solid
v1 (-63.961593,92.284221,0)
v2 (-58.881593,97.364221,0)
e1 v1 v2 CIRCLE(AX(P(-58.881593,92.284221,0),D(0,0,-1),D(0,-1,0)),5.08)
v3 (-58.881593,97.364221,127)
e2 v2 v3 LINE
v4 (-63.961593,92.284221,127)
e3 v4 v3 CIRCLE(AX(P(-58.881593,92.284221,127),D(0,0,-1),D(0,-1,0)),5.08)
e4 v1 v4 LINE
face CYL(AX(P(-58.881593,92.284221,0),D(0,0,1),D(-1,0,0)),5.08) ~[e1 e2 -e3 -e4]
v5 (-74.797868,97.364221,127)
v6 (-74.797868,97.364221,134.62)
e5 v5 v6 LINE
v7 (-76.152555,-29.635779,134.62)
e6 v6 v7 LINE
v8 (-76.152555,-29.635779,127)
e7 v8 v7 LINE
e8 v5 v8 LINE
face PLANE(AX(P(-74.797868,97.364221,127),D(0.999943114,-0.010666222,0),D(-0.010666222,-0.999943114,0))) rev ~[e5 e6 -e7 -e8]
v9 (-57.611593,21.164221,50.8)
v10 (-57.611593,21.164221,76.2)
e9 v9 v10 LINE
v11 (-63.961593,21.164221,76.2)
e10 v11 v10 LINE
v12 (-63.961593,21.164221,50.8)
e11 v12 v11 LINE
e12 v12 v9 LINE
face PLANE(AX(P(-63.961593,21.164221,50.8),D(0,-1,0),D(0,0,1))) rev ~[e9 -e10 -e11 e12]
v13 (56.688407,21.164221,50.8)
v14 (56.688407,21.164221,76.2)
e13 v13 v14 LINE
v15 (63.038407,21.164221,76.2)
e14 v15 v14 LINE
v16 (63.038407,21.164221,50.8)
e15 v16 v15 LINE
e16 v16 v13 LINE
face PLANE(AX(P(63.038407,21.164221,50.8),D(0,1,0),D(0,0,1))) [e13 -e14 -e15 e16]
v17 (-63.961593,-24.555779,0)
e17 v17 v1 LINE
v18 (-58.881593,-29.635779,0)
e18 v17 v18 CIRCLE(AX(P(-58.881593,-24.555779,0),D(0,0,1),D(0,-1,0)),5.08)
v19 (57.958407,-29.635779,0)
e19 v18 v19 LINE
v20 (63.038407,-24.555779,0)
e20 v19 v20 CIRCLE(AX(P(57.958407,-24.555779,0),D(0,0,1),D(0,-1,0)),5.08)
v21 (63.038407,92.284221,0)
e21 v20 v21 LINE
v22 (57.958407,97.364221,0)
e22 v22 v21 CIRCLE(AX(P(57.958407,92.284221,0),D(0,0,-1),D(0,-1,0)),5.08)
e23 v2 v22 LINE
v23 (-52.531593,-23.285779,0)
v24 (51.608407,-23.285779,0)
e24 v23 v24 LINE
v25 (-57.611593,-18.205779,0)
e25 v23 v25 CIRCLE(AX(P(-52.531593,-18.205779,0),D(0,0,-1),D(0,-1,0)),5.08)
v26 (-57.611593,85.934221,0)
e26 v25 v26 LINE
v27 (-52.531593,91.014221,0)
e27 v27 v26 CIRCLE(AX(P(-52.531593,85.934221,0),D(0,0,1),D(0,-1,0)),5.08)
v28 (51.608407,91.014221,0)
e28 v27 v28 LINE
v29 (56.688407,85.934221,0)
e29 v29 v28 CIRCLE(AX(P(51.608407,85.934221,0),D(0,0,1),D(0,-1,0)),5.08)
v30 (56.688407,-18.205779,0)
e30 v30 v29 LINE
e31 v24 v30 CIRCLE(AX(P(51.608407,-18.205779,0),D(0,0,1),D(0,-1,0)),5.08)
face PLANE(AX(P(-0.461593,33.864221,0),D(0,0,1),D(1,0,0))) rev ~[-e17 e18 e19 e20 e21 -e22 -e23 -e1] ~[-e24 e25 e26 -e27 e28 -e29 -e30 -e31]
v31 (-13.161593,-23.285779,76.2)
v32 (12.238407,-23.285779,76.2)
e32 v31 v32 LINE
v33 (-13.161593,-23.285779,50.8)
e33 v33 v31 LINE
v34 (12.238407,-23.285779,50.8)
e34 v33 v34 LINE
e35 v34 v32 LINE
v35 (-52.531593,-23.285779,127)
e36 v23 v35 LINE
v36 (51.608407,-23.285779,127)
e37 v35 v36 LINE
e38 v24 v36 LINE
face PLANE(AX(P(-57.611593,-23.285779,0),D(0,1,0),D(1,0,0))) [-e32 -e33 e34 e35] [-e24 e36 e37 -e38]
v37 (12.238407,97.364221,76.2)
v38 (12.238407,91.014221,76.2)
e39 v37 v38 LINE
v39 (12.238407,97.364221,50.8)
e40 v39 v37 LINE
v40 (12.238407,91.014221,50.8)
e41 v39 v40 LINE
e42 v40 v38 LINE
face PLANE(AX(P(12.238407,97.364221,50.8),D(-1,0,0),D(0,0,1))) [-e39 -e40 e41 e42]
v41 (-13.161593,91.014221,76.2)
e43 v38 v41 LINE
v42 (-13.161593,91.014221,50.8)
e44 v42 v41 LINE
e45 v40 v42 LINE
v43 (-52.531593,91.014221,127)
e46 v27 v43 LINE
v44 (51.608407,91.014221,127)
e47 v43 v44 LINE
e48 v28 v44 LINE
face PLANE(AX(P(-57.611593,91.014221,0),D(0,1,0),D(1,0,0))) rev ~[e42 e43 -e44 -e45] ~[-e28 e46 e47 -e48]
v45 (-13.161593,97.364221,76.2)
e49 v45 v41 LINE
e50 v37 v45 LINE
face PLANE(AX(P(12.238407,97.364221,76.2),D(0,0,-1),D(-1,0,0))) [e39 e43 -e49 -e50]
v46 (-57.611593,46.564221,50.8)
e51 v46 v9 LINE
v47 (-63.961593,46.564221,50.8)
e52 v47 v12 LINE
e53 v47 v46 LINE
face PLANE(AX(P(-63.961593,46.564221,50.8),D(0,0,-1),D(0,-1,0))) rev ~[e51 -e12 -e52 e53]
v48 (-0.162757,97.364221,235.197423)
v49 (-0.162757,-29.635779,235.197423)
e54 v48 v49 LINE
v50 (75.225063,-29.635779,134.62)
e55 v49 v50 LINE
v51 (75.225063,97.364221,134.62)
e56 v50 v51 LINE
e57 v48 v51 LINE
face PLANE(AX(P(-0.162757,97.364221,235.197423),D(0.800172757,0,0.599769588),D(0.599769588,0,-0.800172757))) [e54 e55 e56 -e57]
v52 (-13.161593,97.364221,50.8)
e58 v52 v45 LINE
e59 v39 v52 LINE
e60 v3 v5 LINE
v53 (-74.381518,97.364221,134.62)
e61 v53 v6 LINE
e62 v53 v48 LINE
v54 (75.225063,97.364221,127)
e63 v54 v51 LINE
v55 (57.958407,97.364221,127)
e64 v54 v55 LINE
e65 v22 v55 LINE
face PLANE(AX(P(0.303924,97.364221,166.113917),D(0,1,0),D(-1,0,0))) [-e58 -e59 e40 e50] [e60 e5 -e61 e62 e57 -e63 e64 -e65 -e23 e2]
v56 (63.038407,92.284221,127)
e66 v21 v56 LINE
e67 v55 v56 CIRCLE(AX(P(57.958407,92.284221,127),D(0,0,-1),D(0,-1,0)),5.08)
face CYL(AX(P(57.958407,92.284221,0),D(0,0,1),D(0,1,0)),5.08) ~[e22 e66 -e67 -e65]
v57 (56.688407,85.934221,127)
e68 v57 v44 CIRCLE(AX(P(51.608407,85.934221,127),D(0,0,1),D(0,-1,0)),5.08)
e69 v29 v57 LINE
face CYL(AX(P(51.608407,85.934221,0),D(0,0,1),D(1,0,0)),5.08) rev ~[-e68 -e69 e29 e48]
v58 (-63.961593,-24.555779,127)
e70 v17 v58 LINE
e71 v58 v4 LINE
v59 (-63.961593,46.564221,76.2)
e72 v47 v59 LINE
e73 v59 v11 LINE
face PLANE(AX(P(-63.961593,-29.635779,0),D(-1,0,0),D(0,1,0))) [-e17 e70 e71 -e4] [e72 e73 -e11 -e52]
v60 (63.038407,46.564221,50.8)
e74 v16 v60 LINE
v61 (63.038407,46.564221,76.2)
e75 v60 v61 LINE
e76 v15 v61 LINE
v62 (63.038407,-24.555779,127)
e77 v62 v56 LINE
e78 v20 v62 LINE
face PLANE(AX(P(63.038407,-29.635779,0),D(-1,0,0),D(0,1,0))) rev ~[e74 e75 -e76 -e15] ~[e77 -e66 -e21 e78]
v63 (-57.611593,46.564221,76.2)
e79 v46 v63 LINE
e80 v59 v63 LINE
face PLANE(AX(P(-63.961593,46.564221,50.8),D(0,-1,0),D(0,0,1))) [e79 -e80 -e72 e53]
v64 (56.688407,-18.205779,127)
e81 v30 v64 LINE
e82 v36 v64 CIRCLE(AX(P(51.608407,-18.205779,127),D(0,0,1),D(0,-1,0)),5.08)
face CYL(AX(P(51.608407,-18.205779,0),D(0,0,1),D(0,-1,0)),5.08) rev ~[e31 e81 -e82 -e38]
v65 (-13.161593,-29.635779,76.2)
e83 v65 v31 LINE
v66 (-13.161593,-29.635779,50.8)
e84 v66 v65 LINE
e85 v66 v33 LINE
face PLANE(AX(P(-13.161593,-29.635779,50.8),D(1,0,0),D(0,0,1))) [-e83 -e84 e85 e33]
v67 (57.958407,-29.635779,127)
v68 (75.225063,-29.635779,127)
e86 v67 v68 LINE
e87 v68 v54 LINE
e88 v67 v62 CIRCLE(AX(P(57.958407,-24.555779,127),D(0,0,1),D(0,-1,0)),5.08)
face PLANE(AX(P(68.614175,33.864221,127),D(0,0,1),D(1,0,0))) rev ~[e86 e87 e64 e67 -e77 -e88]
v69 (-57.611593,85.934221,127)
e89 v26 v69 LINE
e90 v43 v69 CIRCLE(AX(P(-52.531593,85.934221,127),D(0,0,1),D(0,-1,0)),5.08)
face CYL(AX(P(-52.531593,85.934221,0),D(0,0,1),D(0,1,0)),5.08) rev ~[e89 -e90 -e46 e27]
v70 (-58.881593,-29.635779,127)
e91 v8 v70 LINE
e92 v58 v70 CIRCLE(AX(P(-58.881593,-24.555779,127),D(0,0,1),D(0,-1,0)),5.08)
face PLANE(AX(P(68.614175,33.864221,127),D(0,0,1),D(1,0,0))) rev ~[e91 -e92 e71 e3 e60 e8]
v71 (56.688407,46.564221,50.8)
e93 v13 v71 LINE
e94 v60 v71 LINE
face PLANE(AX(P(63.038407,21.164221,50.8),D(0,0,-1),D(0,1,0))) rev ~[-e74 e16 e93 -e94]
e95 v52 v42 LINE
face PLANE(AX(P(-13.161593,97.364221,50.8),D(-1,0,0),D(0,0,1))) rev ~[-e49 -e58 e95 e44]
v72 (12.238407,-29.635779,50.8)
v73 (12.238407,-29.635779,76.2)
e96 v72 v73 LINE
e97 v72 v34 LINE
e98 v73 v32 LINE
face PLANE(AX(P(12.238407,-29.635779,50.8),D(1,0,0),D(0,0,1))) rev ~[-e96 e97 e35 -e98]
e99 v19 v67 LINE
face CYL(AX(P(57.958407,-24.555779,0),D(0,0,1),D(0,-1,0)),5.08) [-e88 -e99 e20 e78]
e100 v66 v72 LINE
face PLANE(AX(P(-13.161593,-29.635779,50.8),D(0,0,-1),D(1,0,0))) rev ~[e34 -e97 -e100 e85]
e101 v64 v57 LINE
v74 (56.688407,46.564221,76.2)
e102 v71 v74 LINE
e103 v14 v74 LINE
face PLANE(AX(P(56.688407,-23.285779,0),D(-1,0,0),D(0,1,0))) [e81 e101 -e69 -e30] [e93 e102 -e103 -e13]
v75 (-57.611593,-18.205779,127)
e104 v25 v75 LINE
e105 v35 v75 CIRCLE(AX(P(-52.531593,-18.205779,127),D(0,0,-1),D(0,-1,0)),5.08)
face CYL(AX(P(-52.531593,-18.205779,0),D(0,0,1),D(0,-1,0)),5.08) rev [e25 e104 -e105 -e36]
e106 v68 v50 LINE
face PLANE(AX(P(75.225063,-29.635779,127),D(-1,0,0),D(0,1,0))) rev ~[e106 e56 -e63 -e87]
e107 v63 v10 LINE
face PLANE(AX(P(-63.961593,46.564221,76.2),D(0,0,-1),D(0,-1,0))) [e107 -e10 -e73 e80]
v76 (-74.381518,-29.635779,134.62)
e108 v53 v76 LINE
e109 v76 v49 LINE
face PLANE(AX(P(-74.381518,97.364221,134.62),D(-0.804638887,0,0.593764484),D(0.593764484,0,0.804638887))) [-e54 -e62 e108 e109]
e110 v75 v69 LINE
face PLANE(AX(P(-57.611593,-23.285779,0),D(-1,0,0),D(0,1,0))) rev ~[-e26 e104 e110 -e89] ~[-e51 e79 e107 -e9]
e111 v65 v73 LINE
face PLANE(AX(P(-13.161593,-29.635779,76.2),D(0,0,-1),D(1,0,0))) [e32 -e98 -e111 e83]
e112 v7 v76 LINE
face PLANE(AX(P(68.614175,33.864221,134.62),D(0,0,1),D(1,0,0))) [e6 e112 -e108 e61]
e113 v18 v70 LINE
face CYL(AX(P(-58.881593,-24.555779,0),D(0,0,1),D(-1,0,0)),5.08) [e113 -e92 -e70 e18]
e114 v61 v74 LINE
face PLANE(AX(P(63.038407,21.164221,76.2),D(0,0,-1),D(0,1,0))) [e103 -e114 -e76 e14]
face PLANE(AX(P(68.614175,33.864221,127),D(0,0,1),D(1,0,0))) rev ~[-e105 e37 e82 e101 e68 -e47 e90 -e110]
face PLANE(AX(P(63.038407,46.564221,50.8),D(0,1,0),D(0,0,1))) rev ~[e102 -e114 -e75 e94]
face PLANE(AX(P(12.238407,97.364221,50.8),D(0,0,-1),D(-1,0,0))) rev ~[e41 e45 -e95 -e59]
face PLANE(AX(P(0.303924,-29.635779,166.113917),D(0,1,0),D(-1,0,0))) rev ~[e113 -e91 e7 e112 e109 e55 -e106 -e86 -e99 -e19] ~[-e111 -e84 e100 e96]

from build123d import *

# Parameters (mm, degrees)
F0_W      = 127
F0_H      = 127
F0_W_2    = 114.3
F0_H_2    = 114.3
F1_DEPTH  = 127
F2_W      = 25.4
F2_H      = 25.4
F3_DEPTH  = 6.35
F6_COUNT  = 4
F7_R      = 5.08
F9_DEPTH  = 7.62
F11_DEPTH = 127


with BuildPart() as f1:
    # F0 (on Top) → F1 (new body)
    with BuildSketch(Plane.XY):
        with Locations((-0.4615932703, 33.8642211668)):
            Rectangle(F0_W, F0_H)
        with Locations((-0.4615932703, 33.8642211668)):
            Rectangle(F0_W_2, F0_H_2, mode=Mode.SUBTRACT)
    extrude(amount=F1_DEPTH)

    # F2 (on face) → F3 (cut, through all)
    with BuildSketch(Plane.YZ.offset(63.0384067297)):
        with Locations((33.8642211668, 63.5)):
            Rectangle(F2_W, F2_H)
    f3 = extrude(amount=-F3_DEPTH, mode=Mode.SUBTRACT)

    # F6: F3 ×4 about axis
    f6_axis = Axis((-0.4615932703, 33.8642211668, 78.3742320016), (0, 0, -1))
    for i in range(1, F6_COUNT):
        add(f3.rotate(f6_axis, i * 360 / F6_COUNT), mode=Mode.SUBTRACT)

    # F7
    f7_edges = [f1.edges().sort_by_distance(p)[0] for p in [
        (-63.961593, -29.635779, 63.5),
        (63.038407, -29.635779, 63.5),
        (-63.961593, 97.364221, 63.5),
        (56.688407, 91.014221, 63.5),
        (63.038407, 97.364221, 63.5),
        (-57.611593, 91.014221, 63.5),
        (-57.611593, -23.285779, 63.5),
        (56.688407, -23.285779, 63.5),
    ]]
    fillet(f7_edges, radius=F7_R)

    # F8 (on face) → F9 (join)
    with BuildSketch(Plane.XY.offset(127)):
        with BuildLine():
            ThreePointArc((63.0384067297, -24.5557788332), (61.5505091781, -28.1478812816), (57.9584067297, -29.6357788332))
            Line((57.9584067297, -29.6357788332), (75.2250626683, -29.6357788332))
            Line((75.2250626683, -29.6357788332), (75.2250626683, 97.3642211668))
            Line((75.2250626683, 97.3642211668), (57.9584067297, 97.3642211668))
            ThreePointArc((57.9584067297, 97.3642211668), (61.5505091781, 95.8763236152), (63.0384067297, 92.2842211668))
            Line((63.0384067297, 92.2842211668), (63.0384067297, -24.5557788332))
        make_face()
        with BuildLine():
            ThreePointArc((-63.9615932703, -24.5557788332), (-62.4736957187, -28.1478812816), (-58.8815932703, -29.6357788332))
            Line((-58.8815932703, -29.6357788332), (57.9584067297, -29.6357788332))
            ThreePointArc((57.9584067297, -29.6357788332), (61.5505091781, -28.1478812816), (63.0384067297, -24.5557788332))
            Line((63.0384067297, -24.5557788332), (63.0384067297, 92.2842211668))
            ThreePointArc((63.0384067297, 92.2842211668), (61.5505091781, 95.8763236152), (57.9584067297, 97.3642211668))
            Line((57.9584067297, 97.3642211668), (-58.8815932703, 97.3642211668))
            ThreePointArc((-58.8815932703, 97.3642211668), (-62.4736957187, 95.8763236152), (-63.9615932703, 92.2842211668))
            Line((-63.9615932703, 92.2842211668), (-63.9615932703, -24.5557788332))
        make_face()
        with BuildLine():
            ThreePointArc((-52.5315932703, -23.2857788332), (-56.1236957187, -21.7978812816), (-57.6115932703, -18.2057788332))
            Line((-57.6115932703, -18.2057788332), (-57.6115932703, 85.9342211668))
            ThreePointArc((-57.6115932703, 85.9342211668), (-56.1236957187, 89.5263236152), (-52.5315932703, 91.0142211668))
            Line((-52.5315932703, 91.0142211668), (51.6084067297, 91.0142211668))
            ThreePointArc((51.6084067297, 91.0142211668), (55.2005091781, 89.5263236152), (56.6884067297, 85.9342211668))
            Line((56.6884067297, 85.9342211668), (56.6884067297, -18.2057788332))
            ThreePointArc((56.6884067297, -18.2057788332), (55.2005091781, -21.7978812816), (51.6084067297, -23.2857788332))
            Line((51.6084067297, -23.2857788332), (-52.5315932703, -23.2857788332))
        make_face(mode=Mode.SUBTRACT)
        with BuildLine():
            Line((-57.6115932703, 85.9342211668), (-57.6115932703, -18.2057788332))
            ThreePointArc((-57.6115932703, -18.2057788332), (-56.1236957187, -21.7978812816), (-52.5315932703, -23.2857788332))
            Line((-52.5315932703, -23.2857788332), (51.6084067297, -23.2857788332))
            ThreePointArc((51.6084067297, -23.2857788332), (55.2005091781, -21.7978812816), (56.6884067297, -18.2057788332))
            Line((56.6884067297, -18.2057788332), (56.6884067297, 85.9342211668))
            ThreePointArc((56.6884067297, 85.9342211668), (55.2005091781, 89.5263236152), (51.6084067297, 91.0142211668))
            Line((51.6084067297, 91.0142211668), (-52.5315932703, 91.0142211668))
            ThreePointArc((-52.5315932703, 91.0142211668), (-56.1236957187, 89.5263236152), (-57.6115932703, 85.9342211668))
        make_face()
        with BuildLine():
            Line((-74.7978676376, 97.3642211668), (-76.1525549474, -29.6357788332))
            Line((-76.1525549474, -29.6357788332), (-58.8815932703, -29.6357788332))
            ThreePointArc((-58.8815932703, -29.6357788332), (-62.4736957187, -28.1478812816), (-63.9615932703, -24.5557788332))
            Line((-63.9615932703, -24.5557788332), (-63.9615932703, 92.2842211668))
            ThreePointArc((-63.9615932703, 92.2842211668), (-62.4736957187, 95.8763236152), (-58.8815932703, 97.3642211668))
            Line((-58.8815932703, 97.3642211668), (-74.7978676376, 97.3642211668))
        make_face()
    extrude(amount=F9_DEPTH)

    # F10 (on face) → F11 (join, through all)
    with BuildSketch(Plane(origin=(0, 97.3642211668, 0), x_dir=(-1, 0, 0), z_dir=(0, 1, 0))):
        Polygon((0.1627568882, 235.1974227433), (-75.2250626683, 134.62), (74.3815182296, 134.62), align=None)
    extrude(amount=-F11_DEPTH)


solid = f1.part
